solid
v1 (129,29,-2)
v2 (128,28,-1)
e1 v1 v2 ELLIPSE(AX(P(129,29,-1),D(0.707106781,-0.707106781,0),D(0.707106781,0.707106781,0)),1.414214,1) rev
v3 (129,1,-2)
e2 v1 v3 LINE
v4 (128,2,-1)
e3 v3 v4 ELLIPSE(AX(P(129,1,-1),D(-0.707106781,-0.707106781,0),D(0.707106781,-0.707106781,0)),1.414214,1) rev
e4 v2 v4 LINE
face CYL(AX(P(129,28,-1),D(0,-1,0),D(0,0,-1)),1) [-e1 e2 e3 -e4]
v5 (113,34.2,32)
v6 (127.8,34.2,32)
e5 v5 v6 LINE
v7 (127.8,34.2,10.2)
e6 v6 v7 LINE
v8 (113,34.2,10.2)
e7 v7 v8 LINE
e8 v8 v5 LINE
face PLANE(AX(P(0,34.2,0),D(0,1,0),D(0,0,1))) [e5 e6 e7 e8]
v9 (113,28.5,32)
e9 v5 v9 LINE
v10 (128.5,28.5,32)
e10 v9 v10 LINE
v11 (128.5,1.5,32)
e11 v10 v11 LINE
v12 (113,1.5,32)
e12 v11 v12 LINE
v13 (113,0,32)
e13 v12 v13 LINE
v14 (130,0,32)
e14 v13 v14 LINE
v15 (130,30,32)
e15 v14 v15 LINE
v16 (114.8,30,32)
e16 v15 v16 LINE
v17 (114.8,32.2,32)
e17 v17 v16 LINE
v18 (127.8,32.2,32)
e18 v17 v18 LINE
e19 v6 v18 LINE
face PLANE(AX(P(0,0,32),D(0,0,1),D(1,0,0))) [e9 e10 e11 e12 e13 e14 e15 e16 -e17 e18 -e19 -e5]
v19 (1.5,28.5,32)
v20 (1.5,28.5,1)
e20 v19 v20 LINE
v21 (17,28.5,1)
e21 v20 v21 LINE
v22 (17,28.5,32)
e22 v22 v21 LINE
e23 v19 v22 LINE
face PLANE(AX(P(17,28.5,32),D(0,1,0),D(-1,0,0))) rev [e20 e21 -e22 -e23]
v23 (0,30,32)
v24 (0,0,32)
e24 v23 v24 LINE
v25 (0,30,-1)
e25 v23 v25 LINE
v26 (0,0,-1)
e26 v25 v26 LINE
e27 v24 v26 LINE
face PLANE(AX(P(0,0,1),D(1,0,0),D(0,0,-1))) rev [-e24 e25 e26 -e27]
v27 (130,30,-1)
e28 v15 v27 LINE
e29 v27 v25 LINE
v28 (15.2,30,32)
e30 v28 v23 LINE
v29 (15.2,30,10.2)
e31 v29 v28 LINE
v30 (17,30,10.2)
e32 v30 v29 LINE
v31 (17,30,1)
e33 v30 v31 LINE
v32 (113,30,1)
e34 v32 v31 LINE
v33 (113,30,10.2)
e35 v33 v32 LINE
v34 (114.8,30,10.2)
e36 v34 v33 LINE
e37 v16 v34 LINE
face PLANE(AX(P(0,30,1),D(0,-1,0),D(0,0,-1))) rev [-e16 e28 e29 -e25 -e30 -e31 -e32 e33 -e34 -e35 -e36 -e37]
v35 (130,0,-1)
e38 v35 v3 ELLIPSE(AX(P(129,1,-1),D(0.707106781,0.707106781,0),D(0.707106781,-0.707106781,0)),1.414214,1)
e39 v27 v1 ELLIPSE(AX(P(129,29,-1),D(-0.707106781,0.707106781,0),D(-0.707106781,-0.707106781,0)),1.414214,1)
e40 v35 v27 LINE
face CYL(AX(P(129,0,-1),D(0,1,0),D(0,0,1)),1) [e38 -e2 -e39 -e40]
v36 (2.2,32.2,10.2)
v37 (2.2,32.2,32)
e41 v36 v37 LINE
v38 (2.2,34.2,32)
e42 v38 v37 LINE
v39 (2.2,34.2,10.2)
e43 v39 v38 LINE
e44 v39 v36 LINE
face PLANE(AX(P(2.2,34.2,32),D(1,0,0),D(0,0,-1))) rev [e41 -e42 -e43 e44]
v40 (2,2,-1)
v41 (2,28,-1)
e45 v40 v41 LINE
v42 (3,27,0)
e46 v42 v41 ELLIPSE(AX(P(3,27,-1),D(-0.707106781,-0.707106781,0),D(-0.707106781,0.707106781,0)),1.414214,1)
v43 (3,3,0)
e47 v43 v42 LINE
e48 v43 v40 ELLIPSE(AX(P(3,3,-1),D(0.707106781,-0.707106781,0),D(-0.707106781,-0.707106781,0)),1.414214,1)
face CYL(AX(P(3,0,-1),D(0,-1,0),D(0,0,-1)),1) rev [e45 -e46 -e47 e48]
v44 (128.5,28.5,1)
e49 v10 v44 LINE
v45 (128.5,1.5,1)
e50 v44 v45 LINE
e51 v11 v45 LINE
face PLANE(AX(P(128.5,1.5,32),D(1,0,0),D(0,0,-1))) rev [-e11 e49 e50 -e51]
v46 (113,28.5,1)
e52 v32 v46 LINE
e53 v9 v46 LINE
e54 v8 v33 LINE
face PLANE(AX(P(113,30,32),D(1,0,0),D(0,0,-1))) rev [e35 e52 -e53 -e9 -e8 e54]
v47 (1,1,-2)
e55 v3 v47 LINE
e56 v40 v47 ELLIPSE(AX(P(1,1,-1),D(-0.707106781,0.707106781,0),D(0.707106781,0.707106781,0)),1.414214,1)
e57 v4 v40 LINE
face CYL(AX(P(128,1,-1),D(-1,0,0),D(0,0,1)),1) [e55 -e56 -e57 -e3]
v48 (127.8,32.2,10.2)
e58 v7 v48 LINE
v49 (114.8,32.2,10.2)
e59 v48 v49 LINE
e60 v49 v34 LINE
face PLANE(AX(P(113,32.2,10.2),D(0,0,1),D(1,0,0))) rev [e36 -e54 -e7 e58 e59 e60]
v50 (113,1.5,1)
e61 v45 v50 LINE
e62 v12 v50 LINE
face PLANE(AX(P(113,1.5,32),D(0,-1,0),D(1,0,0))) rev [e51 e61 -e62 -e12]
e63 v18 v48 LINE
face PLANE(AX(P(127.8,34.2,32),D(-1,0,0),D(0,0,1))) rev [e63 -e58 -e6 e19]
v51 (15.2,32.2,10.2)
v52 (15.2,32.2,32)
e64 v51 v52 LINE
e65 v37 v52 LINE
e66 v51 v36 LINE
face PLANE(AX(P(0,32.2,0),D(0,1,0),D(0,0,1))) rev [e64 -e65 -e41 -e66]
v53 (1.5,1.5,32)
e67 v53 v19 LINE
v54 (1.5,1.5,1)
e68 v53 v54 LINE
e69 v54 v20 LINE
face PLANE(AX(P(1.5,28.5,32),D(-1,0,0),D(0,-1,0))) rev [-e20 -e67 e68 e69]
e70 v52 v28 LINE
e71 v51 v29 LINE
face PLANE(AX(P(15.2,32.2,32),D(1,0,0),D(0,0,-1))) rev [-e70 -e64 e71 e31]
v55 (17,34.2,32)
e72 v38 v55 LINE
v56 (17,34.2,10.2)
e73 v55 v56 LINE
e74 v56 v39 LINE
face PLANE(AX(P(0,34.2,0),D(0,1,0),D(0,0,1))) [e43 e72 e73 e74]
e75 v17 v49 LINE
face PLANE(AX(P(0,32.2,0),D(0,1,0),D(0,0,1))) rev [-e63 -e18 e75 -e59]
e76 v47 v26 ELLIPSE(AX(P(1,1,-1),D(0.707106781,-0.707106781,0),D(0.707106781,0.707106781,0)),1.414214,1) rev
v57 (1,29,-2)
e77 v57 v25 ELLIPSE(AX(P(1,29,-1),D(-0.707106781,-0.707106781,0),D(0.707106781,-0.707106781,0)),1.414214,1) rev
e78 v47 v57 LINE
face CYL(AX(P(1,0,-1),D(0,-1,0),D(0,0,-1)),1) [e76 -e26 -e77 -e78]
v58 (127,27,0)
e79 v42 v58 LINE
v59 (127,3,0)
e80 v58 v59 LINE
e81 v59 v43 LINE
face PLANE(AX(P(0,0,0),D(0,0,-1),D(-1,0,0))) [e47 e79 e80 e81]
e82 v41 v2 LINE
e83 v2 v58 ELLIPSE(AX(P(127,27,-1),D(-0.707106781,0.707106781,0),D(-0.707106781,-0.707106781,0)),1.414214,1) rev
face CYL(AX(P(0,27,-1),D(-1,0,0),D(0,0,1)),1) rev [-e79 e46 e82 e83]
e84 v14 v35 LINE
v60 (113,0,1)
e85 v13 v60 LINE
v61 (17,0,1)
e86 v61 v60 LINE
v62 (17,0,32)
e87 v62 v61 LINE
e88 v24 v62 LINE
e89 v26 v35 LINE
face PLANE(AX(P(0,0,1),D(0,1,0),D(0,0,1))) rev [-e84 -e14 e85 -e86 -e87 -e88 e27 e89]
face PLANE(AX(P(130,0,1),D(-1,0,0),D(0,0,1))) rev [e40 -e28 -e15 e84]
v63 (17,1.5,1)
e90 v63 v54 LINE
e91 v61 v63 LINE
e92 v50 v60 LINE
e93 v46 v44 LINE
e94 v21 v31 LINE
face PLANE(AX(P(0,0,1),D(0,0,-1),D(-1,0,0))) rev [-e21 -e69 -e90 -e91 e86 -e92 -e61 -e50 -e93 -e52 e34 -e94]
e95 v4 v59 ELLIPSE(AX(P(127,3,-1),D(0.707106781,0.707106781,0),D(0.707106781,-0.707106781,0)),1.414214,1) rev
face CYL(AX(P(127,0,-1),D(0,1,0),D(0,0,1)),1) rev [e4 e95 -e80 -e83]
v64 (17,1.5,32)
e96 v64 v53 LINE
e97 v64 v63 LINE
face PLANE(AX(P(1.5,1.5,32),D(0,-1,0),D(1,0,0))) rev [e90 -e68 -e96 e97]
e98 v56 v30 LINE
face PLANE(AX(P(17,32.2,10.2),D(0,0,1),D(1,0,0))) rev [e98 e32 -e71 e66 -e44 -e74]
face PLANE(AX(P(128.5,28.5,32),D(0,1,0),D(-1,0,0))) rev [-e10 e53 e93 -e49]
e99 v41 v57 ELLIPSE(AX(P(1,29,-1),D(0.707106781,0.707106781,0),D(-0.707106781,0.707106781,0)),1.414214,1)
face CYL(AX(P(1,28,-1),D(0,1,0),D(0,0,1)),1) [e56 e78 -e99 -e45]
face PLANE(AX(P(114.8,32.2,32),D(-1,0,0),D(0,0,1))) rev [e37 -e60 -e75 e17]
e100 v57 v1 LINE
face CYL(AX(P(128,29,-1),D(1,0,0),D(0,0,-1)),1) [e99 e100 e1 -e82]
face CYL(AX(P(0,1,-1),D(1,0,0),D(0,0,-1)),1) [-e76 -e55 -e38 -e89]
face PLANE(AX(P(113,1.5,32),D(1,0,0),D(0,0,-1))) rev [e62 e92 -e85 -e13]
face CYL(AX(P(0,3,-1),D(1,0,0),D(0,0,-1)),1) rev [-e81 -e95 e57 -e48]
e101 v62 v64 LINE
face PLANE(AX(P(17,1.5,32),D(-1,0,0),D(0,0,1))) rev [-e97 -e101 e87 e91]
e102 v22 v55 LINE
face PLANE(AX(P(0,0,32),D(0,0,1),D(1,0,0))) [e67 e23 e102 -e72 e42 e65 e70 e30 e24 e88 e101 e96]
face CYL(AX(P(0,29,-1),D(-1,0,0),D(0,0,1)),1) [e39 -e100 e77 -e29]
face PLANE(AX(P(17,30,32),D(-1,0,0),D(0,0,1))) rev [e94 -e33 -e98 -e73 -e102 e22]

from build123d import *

# Parameters (mm, degrees)
ESQUISSE1_W        = 130
ESQUISSE1_H        = 30
BOSS_EXTRU_1_DEPTH = 1
BOSS_EXTRU_2_DEPTH = 31
ESQUISSE5_W        = 1.8
ESQUISSE5_H        = 21.8
BOSS_EXTRU_4_DEPTH = 2.2
ESQUISSE6_W        = 14.8
ESQUISSE6_H        = 21.8
BOSS_EXTRU_5_DEPTH = 2
ESQUISSE3_W        = 130
ESQUISSE3_H        = 30
ESQUISSE3_W_2      = 126
ESQUISSE3_H_2      = 26
BOSS_EXTRU_3_DEPTH = 2
CONG_1_R           = 1


with BuildPart() as part:
    # Esquisse1 → Boss.-Extru.1 (new body)
    with BuildSketch(Plane.XY):
        with Locations((65, 15)):
            Rectangle(ESQUISSE1_W, ESQUISSE1_H)
    extrude(amount=BOSS_EXTRU_1_DEPTH)

    # Esquisse2 → Boss.-Extru.2 (add)
    with BuildSketch(Plane.XY.offset(1)):
        Polygon((128.5, 28.5), (113, 28.5), (113, 30), (130, 30), (130, 0), (113, 0), (113, 1.5), (128.5, 1.5), align=None)
        Polygon((1.5, 28.5), (1.5, 1.5), (17, 1.5), (17, 0), (0, 0), (0, 30), (17, 30), (17, 28.5), align=None)
    extrude(amount=BOSS_EXTRU_2_DEPTH)

    # Esquisse5 → Boss.-Extru.4 (add)
    with BuildSketch(Plane(origin=(0, 30, 0), x_dir=(1, 0, 0), z_dir=(0, 1, 0))):
        with Locations((16.1, -21.1)):
            Rectangle(ESQUISSE5_W, ESQUISSE5_H)
        with Locations((113.9, -21.1)):
            Rectangle(ESQUISSE5_W, ESQUISSE5_H)
    extrude(amount=BOSS_EXTRU_4_DEPTH)

    # Esquisse6 → Boss.-Extru.5 (add)
    with BuildSketch(Plane(origin=(0, 32.2, 0), x_dir=(1, 0, 0), z_dir=(0, 1, 0))):
        with Locations((9.6, -21.1)):
            Rectangle(ESQUISSE6_W, ESQUISSE6_H)
        with Locations((120.4, -21.1)):
            Rectangle(ESQUISSE6_W, ESQUISSE6_H)
    extrude(amount=BOSS_EXTRU_5_DEPTH)

    # Esquisse3 → Boss.-Extru.3 (add)
    with BuildSketch(Plane(origin=(0, 0, 0), x_dir=(-1, 0, 0), z_dir=(0, 0, -1))):
        with Locations((-65, 15)):
            Rectangle(ESQUISSE3_W, ESQUISSE3_H)
        with Locations((-65, 15)):
            Rectangle(ESQUISSE3_W_2, ESQUISSE3_H_2, mode=Mode.SUBTRACT)
    extrude(amount=BOSS_EXTRU_3_DEPTH)

    # Congé1
    cong_1_edges = [part.edges().sort_by_distance(p)[0] for p in [
        (65, 28, 0),
        (2, 15, 0),
        (65, 2, 0),
        (128, 15, 0),
        (2, 15, -2),
        (65, 28, -2),
        (128, 15, -2),
        (65, 2, -2),
        (130, 15, -2),
        (65, 30, -2),
        (0, 15, -2),
        (65, 0, -2),
    ]]
    fillet(cong_1_edges, radius=CONG_1_R - 0.0001)  # a hair under: the kernel refuses the full size


solid = part.part
